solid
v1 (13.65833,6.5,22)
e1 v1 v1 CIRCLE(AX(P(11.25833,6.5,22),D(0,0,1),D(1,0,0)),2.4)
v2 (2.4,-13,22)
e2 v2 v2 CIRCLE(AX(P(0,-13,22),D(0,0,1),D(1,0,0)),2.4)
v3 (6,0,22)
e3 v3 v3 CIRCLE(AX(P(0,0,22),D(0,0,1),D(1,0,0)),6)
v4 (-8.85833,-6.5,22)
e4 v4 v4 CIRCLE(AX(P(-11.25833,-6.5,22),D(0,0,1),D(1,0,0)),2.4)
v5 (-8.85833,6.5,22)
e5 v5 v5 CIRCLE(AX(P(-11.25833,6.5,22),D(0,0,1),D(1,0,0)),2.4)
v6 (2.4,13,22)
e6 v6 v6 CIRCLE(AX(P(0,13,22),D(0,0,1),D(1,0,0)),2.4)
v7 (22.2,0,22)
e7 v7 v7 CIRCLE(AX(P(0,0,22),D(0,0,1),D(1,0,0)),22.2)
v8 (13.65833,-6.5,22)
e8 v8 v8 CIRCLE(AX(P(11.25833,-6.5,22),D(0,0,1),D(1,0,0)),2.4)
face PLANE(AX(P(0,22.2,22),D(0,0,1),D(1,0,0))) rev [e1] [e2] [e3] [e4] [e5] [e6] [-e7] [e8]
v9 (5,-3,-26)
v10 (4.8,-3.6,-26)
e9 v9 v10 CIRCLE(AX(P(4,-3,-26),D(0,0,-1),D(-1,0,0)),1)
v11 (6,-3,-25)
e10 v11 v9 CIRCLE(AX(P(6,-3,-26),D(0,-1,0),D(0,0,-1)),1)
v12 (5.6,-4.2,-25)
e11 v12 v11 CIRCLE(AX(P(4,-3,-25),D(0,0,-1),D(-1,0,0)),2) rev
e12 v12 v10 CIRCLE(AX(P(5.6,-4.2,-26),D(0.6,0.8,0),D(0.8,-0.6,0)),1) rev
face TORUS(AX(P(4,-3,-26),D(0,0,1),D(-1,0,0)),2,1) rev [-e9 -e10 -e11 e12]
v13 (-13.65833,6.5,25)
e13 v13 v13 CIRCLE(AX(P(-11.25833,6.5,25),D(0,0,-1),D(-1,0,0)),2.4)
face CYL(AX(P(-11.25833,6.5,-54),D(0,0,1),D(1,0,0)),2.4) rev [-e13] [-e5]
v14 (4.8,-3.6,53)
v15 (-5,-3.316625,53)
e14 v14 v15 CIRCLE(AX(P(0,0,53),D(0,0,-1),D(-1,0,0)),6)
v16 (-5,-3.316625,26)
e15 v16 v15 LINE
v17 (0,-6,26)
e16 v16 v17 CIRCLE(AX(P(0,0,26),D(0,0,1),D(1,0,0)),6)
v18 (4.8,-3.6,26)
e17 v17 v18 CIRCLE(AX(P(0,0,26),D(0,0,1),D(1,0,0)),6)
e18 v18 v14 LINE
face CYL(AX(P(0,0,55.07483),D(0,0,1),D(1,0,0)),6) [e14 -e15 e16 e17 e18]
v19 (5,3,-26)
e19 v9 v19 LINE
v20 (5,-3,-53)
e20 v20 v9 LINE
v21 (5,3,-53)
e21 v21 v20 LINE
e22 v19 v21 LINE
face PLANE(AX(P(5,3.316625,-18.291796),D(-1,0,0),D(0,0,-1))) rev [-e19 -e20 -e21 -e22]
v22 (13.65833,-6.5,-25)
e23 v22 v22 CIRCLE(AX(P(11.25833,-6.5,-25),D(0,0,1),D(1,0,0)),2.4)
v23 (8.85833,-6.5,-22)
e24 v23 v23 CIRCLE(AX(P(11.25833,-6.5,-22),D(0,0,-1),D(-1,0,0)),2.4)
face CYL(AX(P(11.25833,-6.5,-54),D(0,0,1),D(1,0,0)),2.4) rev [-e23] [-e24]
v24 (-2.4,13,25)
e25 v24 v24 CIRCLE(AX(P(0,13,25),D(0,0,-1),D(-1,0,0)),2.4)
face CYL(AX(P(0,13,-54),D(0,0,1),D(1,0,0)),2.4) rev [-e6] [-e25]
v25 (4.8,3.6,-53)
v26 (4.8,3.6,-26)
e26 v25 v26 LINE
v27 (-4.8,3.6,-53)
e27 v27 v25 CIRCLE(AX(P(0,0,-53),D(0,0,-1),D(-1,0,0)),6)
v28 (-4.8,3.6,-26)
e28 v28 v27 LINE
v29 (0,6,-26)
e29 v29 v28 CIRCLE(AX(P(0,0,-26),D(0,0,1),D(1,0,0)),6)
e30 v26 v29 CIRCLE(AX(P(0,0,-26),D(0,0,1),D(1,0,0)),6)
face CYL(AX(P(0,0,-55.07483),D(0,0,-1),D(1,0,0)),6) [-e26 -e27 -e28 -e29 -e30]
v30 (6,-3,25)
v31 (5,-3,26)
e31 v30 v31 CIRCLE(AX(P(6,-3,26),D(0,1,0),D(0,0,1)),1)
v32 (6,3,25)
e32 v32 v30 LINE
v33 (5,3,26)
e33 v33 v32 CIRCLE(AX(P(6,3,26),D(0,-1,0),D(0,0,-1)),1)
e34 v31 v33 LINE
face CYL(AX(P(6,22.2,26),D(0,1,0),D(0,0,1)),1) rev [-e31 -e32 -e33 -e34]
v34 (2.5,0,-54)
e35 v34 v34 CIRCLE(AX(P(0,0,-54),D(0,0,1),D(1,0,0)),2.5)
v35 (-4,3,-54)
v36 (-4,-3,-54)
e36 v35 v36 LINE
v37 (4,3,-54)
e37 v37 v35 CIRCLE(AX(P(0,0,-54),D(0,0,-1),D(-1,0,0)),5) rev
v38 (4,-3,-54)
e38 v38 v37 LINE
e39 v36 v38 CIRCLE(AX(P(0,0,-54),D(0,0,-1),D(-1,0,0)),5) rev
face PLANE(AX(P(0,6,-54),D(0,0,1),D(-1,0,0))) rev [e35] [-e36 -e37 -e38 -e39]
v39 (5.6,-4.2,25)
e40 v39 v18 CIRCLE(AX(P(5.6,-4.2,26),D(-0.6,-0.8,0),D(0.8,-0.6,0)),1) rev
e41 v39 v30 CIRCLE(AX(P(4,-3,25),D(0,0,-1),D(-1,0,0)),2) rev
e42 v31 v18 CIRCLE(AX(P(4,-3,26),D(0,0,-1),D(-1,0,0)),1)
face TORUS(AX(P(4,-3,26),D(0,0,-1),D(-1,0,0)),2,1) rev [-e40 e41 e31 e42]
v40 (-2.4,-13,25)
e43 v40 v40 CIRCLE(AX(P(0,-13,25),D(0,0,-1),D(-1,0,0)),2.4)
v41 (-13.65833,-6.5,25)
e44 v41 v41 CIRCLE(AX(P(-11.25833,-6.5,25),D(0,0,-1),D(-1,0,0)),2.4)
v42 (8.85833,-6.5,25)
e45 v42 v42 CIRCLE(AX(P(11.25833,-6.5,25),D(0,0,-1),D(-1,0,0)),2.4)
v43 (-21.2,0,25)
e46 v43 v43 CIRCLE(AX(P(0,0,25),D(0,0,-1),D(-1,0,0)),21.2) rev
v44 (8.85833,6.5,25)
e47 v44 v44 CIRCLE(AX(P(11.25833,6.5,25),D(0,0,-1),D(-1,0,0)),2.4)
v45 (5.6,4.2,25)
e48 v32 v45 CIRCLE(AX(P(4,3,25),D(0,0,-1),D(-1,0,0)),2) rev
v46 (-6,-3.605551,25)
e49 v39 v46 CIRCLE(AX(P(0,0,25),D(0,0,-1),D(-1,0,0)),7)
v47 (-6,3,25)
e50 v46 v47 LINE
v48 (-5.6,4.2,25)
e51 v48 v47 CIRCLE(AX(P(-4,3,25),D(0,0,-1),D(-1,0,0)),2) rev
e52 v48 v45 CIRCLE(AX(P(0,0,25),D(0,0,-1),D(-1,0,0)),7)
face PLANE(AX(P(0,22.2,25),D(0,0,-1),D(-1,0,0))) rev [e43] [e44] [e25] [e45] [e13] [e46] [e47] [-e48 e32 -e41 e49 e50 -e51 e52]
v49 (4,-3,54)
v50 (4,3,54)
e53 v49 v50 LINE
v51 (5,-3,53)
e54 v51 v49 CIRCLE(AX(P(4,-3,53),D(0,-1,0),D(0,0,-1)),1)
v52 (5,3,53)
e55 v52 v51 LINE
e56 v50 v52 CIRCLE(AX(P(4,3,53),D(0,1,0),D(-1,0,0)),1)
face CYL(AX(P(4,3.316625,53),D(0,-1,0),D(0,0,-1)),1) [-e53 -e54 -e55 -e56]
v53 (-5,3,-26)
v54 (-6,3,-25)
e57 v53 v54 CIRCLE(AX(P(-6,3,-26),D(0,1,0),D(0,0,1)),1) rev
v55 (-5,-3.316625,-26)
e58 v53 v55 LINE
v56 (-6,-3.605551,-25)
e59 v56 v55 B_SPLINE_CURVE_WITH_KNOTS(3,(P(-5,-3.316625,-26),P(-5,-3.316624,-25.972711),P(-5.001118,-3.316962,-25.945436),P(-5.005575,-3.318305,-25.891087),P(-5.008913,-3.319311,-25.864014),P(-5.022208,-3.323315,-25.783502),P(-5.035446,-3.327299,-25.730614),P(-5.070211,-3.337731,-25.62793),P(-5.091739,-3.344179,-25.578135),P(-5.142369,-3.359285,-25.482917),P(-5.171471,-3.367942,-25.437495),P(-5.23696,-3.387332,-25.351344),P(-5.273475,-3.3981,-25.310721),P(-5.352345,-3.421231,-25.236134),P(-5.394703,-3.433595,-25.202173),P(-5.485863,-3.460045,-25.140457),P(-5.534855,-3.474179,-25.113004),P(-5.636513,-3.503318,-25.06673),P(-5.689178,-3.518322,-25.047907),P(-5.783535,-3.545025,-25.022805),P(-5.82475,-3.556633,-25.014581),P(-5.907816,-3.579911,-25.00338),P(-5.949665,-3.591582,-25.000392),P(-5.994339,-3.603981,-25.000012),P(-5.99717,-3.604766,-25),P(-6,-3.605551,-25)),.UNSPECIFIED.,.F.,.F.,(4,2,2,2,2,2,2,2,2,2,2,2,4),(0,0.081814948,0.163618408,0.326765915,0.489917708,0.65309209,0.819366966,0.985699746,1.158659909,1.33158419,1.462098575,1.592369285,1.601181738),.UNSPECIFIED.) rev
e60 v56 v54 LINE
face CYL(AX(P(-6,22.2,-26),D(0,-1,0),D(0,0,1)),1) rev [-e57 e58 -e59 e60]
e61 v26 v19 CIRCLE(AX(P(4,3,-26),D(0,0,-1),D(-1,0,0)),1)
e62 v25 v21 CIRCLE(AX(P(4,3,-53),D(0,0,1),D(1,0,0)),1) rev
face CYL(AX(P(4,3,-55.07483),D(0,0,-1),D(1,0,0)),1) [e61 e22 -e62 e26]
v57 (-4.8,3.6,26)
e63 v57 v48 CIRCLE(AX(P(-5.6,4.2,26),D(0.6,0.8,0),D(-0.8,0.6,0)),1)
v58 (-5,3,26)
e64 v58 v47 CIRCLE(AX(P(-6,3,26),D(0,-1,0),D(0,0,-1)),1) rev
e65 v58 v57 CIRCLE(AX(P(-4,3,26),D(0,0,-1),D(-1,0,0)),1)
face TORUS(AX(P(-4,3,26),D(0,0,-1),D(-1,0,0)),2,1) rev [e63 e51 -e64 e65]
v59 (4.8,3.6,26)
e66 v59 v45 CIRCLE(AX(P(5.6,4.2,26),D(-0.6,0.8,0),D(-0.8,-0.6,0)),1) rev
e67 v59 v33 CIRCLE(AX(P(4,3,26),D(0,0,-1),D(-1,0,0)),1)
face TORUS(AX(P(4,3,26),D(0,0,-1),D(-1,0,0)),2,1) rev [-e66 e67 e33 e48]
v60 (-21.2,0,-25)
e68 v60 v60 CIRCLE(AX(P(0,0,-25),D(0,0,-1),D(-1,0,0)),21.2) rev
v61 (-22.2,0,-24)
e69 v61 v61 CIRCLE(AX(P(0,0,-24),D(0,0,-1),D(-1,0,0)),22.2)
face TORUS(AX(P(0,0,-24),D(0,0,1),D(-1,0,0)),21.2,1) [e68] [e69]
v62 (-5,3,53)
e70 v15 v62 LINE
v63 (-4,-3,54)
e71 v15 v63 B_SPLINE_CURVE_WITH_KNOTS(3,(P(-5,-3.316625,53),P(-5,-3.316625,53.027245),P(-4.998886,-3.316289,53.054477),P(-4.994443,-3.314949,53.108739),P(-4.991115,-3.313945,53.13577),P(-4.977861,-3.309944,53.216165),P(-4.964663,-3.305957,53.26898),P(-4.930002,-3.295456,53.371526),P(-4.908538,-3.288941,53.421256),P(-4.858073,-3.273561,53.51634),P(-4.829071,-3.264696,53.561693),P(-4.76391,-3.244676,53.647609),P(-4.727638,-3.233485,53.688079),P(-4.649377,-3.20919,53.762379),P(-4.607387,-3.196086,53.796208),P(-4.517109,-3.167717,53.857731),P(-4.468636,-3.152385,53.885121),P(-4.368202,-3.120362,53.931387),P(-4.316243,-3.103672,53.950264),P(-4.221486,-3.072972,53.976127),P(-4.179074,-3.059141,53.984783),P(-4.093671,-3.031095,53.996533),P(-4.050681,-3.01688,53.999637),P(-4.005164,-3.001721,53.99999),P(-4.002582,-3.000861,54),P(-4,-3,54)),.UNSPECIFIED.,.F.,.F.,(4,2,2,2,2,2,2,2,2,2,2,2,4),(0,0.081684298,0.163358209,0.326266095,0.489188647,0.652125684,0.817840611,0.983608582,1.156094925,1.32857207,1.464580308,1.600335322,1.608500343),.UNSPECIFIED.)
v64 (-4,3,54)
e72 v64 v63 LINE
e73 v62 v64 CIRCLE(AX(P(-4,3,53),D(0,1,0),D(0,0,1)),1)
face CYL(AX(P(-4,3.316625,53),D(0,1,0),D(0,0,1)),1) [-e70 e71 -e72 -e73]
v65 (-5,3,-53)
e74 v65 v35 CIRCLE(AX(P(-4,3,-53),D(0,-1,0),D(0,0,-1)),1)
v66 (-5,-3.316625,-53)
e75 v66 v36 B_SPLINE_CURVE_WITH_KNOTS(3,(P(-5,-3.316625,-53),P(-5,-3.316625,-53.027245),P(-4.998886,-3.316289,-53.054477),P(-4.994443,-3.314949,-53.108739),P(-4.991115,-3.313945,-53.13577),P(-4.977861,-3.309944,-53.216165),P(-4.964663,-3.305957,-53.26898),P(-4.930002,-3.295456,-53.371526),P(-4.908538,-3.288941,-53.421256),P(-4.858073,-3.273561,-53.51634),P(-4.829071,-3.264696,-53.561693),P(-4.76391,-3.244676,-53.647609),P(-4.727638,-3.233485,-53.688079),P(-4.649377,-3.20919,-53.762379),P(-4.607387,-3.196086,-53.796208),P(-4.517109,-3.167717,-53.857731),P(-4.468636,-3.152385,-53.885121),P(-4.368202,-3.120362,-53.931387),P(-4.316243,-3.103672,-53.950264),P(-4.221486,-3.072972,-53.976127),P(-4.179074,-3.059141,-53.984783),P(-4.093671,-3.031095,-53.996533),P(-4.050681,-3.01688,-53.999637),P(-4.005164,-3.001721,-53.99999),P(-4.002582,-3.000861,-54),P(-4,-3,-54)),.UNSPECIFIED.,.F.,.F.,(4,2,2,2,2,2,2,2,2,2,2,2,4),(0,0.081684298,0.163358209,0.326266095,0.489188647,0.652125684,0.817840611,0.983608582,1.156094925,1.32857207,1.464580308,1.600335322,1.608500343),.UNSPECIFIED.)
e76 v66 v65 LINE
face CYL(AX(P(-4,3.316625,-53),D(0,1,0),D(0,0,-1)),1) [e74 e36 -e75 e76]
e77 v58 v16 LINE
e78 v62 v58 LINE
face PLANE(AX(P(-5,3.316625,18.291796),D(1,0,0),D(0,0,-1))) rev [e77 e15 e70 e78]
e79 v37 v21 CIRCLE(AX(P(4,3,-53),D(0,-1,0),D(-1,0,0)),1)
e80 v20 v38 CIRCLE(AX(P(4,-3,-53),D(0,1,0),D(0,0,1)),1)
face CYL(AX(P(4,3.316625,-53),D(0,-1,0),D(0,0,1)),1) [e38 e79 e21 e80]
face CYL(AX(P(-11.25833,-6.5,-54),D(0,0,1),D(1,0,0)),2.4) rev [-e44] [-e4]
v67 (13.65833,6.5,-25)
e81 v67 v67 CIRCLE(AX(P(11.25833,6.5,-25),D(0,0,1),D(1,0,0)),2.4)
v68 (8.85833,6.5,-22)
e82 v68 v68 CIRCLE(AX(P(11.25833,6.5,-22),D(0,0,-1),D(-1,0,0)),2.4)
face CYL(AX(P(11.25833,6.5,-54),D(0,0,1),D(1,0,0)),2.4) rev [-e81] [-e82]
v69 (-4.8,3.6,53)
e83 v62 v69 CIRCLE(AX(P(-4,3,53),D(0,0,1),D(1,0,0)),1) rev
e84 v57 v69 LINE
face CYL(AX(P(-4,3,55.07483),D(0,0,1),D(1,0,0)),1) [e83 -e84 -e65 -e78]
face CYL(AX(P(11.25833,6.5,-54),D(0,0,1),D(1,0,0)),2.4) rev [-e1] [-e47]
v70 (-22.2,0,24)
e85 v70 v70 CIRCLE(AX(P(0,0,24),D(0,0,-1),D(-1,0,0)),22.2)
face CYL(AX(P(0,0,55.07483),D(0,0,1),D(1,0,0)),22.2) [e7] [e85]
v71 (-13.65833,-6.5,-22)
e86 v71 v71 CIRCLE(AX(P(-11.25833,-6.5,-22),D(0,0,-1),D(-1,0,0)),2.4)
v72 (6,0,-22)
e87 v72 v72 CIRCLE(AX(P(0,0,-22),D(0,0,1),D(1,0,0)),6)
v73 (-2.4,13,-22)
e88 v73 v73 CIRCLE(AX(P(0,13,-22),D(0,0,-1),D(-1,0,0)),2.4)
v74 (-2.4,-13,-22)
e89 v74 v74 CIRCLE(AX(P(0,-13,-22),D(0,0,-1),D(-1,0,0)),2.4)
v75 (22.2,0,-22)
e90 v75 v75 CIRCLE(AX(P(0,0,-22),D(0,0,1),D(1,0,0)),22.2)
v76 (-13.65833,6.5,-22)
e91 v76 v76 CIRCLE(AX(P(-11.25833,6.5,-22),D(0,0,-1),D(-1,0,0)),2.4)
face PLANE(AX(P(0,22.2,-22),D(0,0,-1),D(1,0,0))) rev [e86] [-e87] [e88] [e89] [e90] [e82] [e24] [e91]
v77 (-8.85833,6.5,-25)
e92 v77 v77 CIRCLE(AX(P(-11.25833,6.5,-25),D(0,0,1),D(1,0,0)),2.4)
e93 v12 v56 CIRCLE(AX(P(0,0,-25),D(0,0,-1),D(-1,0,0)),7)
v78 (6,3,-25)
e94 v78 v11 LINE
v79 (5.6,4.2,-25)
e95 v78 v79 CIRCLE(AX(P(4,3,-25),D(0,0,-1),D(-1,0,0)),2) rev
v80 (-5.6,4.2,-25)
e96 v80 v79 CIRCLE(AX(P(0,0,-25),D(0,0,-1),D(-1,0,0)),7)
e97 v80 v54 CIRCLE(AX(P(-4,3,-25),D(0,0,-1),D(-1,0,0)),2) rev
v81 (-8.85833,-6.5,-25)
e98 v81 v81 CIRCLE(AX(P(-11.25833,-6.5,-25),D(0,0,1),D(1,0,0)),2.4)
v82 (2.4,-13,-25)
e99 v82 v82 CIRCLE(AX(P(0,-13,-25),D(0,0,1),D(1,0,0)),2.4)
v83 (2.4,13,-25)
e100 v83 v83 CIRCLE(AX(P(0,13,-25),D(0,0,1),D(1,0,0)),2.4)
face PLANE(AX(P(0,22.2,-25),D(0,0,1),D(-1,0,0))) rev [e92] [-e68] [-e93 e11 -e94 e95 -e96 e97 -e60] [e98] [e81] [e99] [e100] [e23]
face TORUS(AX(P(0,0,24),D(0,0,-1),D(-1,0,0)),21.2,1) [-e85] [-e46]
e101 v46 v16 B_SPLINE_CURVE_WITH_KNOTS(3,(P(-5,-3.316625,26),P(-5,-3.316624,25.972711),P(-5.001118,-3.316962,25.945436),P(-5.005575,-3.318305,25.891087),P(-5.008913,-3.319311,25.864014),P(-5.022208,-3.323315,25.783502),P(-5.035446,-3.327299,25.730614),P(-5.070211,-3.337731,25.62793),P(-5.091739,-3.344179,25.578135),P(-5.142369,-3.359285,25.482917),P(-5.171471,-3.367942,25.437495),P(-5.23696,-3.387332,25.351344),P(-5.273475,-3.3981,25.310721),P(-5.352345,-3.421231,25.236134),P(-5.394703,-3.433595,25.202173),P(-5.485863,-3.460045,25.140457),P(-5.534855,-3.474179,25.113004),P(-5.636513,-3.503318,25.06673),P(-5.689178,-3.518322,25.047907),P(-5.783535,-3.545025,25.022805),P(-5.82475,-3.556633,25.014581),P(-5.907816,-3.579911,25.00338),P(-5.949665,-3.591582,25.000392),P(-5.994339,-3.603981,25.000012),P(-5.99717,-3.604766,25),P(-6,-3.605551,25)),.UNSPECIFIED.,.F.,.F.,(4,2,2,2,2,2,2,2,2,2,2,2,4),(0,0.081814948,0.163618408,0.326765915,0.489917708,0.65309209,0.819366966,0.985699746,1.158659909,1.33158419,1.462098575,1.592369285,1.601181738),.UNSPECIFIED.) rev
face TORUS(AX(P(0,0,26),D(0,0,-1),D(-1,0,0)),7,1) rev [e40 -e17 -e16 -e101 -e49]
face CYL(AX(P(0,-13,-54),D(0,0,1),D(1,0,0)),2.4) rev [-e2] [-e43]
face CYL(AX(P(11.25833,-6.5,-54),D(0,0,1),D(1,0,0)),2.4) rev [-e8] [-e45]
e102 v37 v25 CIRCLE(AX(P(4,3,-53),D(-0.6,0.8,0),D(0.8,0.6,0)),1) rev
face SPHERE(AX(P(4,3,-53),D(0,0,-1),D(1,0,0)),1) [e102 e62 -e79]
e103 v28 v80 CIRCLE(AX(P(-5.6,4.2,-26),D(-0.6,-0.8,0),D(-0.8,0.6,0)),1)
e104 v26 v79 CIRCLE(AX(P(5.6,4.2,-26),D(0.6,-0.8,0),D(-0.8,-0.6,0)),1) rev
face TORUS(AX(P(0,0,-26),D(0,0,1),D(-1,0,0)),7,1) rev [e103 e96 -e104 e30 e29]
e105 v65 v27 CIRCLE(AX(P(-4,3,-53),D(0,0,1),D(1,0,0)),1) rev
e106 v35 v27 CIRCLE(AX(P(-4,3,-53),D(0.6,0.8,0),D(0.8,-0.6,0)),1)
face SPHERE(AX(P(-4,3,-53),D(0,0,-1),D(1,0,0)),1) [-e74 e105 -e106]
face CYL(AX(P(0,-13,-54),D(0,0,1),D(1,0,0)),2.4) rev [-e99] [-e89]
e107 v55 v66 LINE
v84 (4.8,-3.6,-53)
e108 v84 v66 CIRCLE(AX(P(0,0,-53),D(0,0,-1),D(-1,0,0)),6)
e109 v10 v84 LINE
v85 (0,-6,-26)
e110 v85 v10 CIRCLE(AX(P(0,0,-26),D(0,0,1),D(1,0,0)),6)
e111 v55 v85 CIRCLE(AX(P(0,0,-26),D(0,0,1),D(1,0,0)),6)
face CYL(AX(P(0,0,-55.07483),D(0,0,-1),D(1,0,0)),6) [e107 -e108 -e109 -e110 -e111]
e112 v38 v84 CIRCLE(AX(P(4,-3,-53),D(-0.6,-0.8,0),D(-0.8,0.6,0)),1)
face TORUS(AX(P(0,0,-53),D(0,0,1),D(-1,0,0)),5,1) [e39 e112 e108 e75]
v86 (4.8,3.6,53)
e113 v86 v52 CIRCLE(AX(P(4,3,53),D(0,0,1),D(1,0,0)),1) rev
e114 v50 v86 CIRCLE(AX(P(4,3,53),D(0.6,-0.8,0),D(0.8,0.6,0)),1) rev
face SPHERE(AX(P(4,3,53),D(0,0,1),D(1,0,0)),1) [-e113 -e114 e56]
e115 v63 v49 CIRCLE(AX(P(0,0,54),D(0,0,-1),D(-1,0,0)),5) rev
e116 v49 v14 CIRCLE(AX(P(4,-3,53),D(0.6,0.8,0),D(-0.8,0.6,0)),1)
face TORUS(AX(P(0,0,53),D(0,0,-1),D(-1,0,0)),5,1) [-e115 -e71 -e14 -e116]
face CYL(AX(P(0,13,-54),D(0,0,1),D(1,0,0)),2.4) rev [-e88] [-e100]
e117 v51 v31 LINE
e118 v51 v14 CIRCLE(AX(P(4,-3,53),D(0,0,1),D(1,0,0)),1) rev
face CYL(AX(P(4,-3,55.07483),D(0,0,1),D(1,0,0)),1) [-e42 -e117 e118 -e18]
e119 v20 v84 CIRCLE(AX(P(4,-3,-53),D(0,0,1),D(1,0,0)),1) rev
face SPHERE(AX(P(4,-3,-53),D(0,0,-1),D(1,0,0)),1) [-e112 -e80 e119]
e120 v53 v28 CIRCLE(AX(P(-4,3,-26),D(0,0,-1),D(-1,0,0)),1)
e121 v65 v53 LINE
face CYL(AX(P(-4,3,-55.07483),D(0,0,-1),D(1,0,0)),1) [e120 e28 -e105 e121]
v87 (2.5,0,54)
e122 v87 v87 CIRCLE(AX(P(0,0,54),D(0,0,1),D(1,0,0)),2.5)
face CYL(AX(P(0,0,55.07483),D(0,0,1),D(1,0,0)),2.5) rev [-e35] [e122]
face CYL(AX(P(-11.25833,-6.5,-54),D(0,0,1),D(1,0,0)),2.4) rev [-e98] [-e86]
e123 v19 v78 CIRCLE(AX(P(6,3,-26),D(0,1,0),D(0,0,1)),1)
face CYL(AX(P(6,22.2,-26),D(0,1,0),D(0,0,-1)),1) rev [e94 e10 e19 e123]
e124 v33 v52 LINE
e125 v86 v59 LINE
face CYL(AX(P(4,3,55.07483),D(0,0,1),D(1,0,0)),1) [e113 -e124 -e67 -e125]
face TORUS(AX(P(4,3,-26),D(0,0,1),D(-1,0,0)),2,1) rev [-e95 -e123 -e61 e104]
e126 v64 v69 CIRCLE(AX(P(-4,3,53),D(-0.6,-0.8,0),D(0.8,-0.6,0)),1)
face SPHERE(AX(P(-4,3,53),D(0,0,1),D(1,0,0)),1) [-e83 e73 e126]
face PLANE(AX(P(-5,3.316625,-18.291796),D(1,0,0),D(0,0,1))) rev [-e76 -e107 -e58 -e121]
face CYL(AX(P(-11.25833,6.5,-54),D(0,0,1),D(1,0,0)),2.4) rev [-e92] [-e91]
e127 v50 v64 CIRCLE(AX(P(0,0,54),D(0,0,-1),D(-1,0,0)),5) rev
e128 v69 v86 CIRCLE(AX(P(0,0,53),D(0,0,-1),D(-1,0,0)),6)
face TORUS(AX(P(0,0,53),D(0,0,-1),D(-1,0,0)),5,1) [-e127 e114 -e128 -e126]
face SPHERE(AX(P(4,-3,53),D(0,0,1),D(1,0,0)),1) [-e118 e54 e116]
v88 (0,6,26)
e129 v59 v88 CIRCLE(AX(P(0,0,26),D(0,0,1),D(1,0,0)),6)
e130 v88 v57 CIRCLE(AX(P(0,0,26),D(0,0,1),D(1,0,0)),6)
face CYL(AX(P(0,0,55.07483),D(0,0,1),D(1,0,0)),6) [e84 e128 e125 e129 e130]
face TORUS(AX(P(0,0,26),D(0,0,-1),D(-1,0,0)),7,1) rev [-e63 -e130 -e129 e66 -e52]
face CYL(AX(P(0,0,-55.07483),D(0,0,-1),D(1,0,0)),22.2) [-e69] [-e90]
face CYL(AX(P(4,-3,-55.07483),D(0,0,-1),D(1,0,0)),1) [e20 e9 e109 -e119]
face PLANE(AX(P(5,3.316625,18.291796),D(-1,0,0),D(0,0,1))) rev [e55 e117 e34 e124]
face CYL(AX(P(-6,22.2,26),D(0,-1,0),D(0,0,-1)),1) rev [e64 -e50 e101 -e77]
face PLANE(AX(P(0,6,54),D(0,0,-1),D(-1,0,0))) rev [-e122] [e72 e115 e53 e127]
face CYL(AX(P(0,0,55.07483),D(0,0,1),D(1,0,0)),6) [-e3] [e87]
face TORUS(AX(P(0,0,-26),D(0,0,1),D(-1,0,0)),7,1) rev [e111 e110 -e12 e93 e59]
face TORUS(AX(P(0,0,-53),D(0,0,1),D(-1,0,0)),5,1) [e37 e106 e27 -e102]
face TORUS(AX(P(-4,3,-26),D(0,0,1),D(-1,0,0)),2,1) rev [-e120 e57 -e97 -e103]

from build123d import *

# Parameters (mm, degrees)
CORTAR_EXTRUIR1_REACH = 64.463
REDONDEO2_R           = 1
CROQUIS4_R            = 2.4
CORTAR_EXTRUIR2_DEPTH = 63.463429387
MATRIZC1_COUNT        = 6


with BuildPart() as part:
    # Croquis1 → Revolución4 (revolve)
    with BuildSketch(Plane(origin=(0, 0, 0), x_dir=(0, 0, -1), z_dir=(1, 0, 0)), mode=Mode.PRIVATE) as revoluci_n4_sk:
        Polygon((-25, 22.2), (-25, 6), (-26, 6), (-54, 6), (-54, 2.5), (-25, 2.5), (0, 2.5), (0, 6), (-22, 6), (-22, 22.2), align=None)
    revolve(revoluci_n4_sk.sketch.rotate(Axis((0, 0, 55.074829932), (0, 0, -1)), 90), axis=Axis((0, 0, 55.074829932), (0, 0, -1)))

    # Cortar-Extruir1: up to this face of the body (flat: up to its plane)
    cortar_extruir1_end = Plane(part.part.faces().sort_by_distance((-21.572089178, 0, 25))[0])
    # Croquis3 → Cortar-Extruir1 (cut, up to the picked face)
    with BuildSketch(Plane.XY.offset(54), mode=Mode.PRIVATE) as cortar_extruir1_sk1:
        with BuildLine():
            Line((-5, 3.31662479), (-5, -3.31662479))
            ThreePointArc((-5, -3.31662479), (-6, 0), (-5, 3.31662479))
        make_face()
    cortar_extruir1_tool1 = split(extrude(cortar_extruir1_sk1.sketch, amount=-CORTAR_EXTRUIR1_REACH, mode=Mode.PRIVATE), bisect_by=cortar_extruir1_end, keep=Keep.BOTH, mode=Mode.PRIVATE)
    # Croquis3 → Cortar-Extruir1 (cut, up to the picked face)
    with BuildSketch(Plane.XY.offset(54), mode=Mode.PRIVATE) as cortar_extruir1_sk2:
        with BuildLine():
            Line((5, 3.31662479), (5, -3.31662479))
            ThreePointArc((5, -3.31662479), (6, 0), (5, 3.31662479))
        make_face()
    cortar_extruir1_tool2 = split(extrude(cortar_extruir1_sk2.sketch, amount=-CORTAR_EXTRUIR1_REACH, mode=Mode.PRIVATE), bisect_by=cortar_extruir1_end, keep=Keep.BOTH, mode=Mode.PRIVATE)
    add(cortar_extruir1_tool1.solids().sort_by(Axis((-5.403002, 0, 54), (0, 0, -1)))[0], mode=Mode.SUBTRACT)
    add(cortar_extruir1_tool2.solids().sort_by(Axis((5.403002, 0, 54), (0, 0, -1)))[0], mode=Mode.SUBTRACT)

    # Redondeo2
    redondeo2_edges = [part.edges().sort_by_distance(p)[0] for p in [
        (-5, 0, 25),
        (0, 6, 25),
        (0, -6, 25),
        (5, 0, 54),
        (-5, 0, 54),
        (5, 0, 25),
        (-22.2, 0, 25),
        (0, -6, 54),
        (0, 6, 54),
        (-5, 3.31662479, 39.5),
        (5, 3.31662479, 39.5),
        (5, -3.31662479, 39.5),
    ]]
    fillet(redondeo2_edges, radius=REDONDEO2_R - 0.0001)  # a hair under: the kernel refuses the full size

    # Simetría1: part across plane


with BuildPart() as part_1:
    add(part.part)
    add(part.part.mirror(Plane.XY))

    # Croquis4 → Cortar-Extruir2 (cut, symmetric)
    with BuildSketch(Plane.XY):
        with Locations((0, 13)):
            Circle(CROQUIS4_R)
    cortar_extruir2 = extrude(amount=CORTAR_EXTRUIR2_DEPTH, both=True, mode=Mode.SUBTRACT)

    # MatrizC1: Cortar-Extruir2 ×6 about axis
    matrizc1_axis = Axis((0, 0, 0), (0, 0, 1))
    for i in range(1, MATRIZC1_COUNT):
        add(cortar_extruir2.rotate(matrizc1_axis, i * 360 / MATRIZC1_COUNT), mode=Mode.SUBTRACT)


solid = part_1.part
